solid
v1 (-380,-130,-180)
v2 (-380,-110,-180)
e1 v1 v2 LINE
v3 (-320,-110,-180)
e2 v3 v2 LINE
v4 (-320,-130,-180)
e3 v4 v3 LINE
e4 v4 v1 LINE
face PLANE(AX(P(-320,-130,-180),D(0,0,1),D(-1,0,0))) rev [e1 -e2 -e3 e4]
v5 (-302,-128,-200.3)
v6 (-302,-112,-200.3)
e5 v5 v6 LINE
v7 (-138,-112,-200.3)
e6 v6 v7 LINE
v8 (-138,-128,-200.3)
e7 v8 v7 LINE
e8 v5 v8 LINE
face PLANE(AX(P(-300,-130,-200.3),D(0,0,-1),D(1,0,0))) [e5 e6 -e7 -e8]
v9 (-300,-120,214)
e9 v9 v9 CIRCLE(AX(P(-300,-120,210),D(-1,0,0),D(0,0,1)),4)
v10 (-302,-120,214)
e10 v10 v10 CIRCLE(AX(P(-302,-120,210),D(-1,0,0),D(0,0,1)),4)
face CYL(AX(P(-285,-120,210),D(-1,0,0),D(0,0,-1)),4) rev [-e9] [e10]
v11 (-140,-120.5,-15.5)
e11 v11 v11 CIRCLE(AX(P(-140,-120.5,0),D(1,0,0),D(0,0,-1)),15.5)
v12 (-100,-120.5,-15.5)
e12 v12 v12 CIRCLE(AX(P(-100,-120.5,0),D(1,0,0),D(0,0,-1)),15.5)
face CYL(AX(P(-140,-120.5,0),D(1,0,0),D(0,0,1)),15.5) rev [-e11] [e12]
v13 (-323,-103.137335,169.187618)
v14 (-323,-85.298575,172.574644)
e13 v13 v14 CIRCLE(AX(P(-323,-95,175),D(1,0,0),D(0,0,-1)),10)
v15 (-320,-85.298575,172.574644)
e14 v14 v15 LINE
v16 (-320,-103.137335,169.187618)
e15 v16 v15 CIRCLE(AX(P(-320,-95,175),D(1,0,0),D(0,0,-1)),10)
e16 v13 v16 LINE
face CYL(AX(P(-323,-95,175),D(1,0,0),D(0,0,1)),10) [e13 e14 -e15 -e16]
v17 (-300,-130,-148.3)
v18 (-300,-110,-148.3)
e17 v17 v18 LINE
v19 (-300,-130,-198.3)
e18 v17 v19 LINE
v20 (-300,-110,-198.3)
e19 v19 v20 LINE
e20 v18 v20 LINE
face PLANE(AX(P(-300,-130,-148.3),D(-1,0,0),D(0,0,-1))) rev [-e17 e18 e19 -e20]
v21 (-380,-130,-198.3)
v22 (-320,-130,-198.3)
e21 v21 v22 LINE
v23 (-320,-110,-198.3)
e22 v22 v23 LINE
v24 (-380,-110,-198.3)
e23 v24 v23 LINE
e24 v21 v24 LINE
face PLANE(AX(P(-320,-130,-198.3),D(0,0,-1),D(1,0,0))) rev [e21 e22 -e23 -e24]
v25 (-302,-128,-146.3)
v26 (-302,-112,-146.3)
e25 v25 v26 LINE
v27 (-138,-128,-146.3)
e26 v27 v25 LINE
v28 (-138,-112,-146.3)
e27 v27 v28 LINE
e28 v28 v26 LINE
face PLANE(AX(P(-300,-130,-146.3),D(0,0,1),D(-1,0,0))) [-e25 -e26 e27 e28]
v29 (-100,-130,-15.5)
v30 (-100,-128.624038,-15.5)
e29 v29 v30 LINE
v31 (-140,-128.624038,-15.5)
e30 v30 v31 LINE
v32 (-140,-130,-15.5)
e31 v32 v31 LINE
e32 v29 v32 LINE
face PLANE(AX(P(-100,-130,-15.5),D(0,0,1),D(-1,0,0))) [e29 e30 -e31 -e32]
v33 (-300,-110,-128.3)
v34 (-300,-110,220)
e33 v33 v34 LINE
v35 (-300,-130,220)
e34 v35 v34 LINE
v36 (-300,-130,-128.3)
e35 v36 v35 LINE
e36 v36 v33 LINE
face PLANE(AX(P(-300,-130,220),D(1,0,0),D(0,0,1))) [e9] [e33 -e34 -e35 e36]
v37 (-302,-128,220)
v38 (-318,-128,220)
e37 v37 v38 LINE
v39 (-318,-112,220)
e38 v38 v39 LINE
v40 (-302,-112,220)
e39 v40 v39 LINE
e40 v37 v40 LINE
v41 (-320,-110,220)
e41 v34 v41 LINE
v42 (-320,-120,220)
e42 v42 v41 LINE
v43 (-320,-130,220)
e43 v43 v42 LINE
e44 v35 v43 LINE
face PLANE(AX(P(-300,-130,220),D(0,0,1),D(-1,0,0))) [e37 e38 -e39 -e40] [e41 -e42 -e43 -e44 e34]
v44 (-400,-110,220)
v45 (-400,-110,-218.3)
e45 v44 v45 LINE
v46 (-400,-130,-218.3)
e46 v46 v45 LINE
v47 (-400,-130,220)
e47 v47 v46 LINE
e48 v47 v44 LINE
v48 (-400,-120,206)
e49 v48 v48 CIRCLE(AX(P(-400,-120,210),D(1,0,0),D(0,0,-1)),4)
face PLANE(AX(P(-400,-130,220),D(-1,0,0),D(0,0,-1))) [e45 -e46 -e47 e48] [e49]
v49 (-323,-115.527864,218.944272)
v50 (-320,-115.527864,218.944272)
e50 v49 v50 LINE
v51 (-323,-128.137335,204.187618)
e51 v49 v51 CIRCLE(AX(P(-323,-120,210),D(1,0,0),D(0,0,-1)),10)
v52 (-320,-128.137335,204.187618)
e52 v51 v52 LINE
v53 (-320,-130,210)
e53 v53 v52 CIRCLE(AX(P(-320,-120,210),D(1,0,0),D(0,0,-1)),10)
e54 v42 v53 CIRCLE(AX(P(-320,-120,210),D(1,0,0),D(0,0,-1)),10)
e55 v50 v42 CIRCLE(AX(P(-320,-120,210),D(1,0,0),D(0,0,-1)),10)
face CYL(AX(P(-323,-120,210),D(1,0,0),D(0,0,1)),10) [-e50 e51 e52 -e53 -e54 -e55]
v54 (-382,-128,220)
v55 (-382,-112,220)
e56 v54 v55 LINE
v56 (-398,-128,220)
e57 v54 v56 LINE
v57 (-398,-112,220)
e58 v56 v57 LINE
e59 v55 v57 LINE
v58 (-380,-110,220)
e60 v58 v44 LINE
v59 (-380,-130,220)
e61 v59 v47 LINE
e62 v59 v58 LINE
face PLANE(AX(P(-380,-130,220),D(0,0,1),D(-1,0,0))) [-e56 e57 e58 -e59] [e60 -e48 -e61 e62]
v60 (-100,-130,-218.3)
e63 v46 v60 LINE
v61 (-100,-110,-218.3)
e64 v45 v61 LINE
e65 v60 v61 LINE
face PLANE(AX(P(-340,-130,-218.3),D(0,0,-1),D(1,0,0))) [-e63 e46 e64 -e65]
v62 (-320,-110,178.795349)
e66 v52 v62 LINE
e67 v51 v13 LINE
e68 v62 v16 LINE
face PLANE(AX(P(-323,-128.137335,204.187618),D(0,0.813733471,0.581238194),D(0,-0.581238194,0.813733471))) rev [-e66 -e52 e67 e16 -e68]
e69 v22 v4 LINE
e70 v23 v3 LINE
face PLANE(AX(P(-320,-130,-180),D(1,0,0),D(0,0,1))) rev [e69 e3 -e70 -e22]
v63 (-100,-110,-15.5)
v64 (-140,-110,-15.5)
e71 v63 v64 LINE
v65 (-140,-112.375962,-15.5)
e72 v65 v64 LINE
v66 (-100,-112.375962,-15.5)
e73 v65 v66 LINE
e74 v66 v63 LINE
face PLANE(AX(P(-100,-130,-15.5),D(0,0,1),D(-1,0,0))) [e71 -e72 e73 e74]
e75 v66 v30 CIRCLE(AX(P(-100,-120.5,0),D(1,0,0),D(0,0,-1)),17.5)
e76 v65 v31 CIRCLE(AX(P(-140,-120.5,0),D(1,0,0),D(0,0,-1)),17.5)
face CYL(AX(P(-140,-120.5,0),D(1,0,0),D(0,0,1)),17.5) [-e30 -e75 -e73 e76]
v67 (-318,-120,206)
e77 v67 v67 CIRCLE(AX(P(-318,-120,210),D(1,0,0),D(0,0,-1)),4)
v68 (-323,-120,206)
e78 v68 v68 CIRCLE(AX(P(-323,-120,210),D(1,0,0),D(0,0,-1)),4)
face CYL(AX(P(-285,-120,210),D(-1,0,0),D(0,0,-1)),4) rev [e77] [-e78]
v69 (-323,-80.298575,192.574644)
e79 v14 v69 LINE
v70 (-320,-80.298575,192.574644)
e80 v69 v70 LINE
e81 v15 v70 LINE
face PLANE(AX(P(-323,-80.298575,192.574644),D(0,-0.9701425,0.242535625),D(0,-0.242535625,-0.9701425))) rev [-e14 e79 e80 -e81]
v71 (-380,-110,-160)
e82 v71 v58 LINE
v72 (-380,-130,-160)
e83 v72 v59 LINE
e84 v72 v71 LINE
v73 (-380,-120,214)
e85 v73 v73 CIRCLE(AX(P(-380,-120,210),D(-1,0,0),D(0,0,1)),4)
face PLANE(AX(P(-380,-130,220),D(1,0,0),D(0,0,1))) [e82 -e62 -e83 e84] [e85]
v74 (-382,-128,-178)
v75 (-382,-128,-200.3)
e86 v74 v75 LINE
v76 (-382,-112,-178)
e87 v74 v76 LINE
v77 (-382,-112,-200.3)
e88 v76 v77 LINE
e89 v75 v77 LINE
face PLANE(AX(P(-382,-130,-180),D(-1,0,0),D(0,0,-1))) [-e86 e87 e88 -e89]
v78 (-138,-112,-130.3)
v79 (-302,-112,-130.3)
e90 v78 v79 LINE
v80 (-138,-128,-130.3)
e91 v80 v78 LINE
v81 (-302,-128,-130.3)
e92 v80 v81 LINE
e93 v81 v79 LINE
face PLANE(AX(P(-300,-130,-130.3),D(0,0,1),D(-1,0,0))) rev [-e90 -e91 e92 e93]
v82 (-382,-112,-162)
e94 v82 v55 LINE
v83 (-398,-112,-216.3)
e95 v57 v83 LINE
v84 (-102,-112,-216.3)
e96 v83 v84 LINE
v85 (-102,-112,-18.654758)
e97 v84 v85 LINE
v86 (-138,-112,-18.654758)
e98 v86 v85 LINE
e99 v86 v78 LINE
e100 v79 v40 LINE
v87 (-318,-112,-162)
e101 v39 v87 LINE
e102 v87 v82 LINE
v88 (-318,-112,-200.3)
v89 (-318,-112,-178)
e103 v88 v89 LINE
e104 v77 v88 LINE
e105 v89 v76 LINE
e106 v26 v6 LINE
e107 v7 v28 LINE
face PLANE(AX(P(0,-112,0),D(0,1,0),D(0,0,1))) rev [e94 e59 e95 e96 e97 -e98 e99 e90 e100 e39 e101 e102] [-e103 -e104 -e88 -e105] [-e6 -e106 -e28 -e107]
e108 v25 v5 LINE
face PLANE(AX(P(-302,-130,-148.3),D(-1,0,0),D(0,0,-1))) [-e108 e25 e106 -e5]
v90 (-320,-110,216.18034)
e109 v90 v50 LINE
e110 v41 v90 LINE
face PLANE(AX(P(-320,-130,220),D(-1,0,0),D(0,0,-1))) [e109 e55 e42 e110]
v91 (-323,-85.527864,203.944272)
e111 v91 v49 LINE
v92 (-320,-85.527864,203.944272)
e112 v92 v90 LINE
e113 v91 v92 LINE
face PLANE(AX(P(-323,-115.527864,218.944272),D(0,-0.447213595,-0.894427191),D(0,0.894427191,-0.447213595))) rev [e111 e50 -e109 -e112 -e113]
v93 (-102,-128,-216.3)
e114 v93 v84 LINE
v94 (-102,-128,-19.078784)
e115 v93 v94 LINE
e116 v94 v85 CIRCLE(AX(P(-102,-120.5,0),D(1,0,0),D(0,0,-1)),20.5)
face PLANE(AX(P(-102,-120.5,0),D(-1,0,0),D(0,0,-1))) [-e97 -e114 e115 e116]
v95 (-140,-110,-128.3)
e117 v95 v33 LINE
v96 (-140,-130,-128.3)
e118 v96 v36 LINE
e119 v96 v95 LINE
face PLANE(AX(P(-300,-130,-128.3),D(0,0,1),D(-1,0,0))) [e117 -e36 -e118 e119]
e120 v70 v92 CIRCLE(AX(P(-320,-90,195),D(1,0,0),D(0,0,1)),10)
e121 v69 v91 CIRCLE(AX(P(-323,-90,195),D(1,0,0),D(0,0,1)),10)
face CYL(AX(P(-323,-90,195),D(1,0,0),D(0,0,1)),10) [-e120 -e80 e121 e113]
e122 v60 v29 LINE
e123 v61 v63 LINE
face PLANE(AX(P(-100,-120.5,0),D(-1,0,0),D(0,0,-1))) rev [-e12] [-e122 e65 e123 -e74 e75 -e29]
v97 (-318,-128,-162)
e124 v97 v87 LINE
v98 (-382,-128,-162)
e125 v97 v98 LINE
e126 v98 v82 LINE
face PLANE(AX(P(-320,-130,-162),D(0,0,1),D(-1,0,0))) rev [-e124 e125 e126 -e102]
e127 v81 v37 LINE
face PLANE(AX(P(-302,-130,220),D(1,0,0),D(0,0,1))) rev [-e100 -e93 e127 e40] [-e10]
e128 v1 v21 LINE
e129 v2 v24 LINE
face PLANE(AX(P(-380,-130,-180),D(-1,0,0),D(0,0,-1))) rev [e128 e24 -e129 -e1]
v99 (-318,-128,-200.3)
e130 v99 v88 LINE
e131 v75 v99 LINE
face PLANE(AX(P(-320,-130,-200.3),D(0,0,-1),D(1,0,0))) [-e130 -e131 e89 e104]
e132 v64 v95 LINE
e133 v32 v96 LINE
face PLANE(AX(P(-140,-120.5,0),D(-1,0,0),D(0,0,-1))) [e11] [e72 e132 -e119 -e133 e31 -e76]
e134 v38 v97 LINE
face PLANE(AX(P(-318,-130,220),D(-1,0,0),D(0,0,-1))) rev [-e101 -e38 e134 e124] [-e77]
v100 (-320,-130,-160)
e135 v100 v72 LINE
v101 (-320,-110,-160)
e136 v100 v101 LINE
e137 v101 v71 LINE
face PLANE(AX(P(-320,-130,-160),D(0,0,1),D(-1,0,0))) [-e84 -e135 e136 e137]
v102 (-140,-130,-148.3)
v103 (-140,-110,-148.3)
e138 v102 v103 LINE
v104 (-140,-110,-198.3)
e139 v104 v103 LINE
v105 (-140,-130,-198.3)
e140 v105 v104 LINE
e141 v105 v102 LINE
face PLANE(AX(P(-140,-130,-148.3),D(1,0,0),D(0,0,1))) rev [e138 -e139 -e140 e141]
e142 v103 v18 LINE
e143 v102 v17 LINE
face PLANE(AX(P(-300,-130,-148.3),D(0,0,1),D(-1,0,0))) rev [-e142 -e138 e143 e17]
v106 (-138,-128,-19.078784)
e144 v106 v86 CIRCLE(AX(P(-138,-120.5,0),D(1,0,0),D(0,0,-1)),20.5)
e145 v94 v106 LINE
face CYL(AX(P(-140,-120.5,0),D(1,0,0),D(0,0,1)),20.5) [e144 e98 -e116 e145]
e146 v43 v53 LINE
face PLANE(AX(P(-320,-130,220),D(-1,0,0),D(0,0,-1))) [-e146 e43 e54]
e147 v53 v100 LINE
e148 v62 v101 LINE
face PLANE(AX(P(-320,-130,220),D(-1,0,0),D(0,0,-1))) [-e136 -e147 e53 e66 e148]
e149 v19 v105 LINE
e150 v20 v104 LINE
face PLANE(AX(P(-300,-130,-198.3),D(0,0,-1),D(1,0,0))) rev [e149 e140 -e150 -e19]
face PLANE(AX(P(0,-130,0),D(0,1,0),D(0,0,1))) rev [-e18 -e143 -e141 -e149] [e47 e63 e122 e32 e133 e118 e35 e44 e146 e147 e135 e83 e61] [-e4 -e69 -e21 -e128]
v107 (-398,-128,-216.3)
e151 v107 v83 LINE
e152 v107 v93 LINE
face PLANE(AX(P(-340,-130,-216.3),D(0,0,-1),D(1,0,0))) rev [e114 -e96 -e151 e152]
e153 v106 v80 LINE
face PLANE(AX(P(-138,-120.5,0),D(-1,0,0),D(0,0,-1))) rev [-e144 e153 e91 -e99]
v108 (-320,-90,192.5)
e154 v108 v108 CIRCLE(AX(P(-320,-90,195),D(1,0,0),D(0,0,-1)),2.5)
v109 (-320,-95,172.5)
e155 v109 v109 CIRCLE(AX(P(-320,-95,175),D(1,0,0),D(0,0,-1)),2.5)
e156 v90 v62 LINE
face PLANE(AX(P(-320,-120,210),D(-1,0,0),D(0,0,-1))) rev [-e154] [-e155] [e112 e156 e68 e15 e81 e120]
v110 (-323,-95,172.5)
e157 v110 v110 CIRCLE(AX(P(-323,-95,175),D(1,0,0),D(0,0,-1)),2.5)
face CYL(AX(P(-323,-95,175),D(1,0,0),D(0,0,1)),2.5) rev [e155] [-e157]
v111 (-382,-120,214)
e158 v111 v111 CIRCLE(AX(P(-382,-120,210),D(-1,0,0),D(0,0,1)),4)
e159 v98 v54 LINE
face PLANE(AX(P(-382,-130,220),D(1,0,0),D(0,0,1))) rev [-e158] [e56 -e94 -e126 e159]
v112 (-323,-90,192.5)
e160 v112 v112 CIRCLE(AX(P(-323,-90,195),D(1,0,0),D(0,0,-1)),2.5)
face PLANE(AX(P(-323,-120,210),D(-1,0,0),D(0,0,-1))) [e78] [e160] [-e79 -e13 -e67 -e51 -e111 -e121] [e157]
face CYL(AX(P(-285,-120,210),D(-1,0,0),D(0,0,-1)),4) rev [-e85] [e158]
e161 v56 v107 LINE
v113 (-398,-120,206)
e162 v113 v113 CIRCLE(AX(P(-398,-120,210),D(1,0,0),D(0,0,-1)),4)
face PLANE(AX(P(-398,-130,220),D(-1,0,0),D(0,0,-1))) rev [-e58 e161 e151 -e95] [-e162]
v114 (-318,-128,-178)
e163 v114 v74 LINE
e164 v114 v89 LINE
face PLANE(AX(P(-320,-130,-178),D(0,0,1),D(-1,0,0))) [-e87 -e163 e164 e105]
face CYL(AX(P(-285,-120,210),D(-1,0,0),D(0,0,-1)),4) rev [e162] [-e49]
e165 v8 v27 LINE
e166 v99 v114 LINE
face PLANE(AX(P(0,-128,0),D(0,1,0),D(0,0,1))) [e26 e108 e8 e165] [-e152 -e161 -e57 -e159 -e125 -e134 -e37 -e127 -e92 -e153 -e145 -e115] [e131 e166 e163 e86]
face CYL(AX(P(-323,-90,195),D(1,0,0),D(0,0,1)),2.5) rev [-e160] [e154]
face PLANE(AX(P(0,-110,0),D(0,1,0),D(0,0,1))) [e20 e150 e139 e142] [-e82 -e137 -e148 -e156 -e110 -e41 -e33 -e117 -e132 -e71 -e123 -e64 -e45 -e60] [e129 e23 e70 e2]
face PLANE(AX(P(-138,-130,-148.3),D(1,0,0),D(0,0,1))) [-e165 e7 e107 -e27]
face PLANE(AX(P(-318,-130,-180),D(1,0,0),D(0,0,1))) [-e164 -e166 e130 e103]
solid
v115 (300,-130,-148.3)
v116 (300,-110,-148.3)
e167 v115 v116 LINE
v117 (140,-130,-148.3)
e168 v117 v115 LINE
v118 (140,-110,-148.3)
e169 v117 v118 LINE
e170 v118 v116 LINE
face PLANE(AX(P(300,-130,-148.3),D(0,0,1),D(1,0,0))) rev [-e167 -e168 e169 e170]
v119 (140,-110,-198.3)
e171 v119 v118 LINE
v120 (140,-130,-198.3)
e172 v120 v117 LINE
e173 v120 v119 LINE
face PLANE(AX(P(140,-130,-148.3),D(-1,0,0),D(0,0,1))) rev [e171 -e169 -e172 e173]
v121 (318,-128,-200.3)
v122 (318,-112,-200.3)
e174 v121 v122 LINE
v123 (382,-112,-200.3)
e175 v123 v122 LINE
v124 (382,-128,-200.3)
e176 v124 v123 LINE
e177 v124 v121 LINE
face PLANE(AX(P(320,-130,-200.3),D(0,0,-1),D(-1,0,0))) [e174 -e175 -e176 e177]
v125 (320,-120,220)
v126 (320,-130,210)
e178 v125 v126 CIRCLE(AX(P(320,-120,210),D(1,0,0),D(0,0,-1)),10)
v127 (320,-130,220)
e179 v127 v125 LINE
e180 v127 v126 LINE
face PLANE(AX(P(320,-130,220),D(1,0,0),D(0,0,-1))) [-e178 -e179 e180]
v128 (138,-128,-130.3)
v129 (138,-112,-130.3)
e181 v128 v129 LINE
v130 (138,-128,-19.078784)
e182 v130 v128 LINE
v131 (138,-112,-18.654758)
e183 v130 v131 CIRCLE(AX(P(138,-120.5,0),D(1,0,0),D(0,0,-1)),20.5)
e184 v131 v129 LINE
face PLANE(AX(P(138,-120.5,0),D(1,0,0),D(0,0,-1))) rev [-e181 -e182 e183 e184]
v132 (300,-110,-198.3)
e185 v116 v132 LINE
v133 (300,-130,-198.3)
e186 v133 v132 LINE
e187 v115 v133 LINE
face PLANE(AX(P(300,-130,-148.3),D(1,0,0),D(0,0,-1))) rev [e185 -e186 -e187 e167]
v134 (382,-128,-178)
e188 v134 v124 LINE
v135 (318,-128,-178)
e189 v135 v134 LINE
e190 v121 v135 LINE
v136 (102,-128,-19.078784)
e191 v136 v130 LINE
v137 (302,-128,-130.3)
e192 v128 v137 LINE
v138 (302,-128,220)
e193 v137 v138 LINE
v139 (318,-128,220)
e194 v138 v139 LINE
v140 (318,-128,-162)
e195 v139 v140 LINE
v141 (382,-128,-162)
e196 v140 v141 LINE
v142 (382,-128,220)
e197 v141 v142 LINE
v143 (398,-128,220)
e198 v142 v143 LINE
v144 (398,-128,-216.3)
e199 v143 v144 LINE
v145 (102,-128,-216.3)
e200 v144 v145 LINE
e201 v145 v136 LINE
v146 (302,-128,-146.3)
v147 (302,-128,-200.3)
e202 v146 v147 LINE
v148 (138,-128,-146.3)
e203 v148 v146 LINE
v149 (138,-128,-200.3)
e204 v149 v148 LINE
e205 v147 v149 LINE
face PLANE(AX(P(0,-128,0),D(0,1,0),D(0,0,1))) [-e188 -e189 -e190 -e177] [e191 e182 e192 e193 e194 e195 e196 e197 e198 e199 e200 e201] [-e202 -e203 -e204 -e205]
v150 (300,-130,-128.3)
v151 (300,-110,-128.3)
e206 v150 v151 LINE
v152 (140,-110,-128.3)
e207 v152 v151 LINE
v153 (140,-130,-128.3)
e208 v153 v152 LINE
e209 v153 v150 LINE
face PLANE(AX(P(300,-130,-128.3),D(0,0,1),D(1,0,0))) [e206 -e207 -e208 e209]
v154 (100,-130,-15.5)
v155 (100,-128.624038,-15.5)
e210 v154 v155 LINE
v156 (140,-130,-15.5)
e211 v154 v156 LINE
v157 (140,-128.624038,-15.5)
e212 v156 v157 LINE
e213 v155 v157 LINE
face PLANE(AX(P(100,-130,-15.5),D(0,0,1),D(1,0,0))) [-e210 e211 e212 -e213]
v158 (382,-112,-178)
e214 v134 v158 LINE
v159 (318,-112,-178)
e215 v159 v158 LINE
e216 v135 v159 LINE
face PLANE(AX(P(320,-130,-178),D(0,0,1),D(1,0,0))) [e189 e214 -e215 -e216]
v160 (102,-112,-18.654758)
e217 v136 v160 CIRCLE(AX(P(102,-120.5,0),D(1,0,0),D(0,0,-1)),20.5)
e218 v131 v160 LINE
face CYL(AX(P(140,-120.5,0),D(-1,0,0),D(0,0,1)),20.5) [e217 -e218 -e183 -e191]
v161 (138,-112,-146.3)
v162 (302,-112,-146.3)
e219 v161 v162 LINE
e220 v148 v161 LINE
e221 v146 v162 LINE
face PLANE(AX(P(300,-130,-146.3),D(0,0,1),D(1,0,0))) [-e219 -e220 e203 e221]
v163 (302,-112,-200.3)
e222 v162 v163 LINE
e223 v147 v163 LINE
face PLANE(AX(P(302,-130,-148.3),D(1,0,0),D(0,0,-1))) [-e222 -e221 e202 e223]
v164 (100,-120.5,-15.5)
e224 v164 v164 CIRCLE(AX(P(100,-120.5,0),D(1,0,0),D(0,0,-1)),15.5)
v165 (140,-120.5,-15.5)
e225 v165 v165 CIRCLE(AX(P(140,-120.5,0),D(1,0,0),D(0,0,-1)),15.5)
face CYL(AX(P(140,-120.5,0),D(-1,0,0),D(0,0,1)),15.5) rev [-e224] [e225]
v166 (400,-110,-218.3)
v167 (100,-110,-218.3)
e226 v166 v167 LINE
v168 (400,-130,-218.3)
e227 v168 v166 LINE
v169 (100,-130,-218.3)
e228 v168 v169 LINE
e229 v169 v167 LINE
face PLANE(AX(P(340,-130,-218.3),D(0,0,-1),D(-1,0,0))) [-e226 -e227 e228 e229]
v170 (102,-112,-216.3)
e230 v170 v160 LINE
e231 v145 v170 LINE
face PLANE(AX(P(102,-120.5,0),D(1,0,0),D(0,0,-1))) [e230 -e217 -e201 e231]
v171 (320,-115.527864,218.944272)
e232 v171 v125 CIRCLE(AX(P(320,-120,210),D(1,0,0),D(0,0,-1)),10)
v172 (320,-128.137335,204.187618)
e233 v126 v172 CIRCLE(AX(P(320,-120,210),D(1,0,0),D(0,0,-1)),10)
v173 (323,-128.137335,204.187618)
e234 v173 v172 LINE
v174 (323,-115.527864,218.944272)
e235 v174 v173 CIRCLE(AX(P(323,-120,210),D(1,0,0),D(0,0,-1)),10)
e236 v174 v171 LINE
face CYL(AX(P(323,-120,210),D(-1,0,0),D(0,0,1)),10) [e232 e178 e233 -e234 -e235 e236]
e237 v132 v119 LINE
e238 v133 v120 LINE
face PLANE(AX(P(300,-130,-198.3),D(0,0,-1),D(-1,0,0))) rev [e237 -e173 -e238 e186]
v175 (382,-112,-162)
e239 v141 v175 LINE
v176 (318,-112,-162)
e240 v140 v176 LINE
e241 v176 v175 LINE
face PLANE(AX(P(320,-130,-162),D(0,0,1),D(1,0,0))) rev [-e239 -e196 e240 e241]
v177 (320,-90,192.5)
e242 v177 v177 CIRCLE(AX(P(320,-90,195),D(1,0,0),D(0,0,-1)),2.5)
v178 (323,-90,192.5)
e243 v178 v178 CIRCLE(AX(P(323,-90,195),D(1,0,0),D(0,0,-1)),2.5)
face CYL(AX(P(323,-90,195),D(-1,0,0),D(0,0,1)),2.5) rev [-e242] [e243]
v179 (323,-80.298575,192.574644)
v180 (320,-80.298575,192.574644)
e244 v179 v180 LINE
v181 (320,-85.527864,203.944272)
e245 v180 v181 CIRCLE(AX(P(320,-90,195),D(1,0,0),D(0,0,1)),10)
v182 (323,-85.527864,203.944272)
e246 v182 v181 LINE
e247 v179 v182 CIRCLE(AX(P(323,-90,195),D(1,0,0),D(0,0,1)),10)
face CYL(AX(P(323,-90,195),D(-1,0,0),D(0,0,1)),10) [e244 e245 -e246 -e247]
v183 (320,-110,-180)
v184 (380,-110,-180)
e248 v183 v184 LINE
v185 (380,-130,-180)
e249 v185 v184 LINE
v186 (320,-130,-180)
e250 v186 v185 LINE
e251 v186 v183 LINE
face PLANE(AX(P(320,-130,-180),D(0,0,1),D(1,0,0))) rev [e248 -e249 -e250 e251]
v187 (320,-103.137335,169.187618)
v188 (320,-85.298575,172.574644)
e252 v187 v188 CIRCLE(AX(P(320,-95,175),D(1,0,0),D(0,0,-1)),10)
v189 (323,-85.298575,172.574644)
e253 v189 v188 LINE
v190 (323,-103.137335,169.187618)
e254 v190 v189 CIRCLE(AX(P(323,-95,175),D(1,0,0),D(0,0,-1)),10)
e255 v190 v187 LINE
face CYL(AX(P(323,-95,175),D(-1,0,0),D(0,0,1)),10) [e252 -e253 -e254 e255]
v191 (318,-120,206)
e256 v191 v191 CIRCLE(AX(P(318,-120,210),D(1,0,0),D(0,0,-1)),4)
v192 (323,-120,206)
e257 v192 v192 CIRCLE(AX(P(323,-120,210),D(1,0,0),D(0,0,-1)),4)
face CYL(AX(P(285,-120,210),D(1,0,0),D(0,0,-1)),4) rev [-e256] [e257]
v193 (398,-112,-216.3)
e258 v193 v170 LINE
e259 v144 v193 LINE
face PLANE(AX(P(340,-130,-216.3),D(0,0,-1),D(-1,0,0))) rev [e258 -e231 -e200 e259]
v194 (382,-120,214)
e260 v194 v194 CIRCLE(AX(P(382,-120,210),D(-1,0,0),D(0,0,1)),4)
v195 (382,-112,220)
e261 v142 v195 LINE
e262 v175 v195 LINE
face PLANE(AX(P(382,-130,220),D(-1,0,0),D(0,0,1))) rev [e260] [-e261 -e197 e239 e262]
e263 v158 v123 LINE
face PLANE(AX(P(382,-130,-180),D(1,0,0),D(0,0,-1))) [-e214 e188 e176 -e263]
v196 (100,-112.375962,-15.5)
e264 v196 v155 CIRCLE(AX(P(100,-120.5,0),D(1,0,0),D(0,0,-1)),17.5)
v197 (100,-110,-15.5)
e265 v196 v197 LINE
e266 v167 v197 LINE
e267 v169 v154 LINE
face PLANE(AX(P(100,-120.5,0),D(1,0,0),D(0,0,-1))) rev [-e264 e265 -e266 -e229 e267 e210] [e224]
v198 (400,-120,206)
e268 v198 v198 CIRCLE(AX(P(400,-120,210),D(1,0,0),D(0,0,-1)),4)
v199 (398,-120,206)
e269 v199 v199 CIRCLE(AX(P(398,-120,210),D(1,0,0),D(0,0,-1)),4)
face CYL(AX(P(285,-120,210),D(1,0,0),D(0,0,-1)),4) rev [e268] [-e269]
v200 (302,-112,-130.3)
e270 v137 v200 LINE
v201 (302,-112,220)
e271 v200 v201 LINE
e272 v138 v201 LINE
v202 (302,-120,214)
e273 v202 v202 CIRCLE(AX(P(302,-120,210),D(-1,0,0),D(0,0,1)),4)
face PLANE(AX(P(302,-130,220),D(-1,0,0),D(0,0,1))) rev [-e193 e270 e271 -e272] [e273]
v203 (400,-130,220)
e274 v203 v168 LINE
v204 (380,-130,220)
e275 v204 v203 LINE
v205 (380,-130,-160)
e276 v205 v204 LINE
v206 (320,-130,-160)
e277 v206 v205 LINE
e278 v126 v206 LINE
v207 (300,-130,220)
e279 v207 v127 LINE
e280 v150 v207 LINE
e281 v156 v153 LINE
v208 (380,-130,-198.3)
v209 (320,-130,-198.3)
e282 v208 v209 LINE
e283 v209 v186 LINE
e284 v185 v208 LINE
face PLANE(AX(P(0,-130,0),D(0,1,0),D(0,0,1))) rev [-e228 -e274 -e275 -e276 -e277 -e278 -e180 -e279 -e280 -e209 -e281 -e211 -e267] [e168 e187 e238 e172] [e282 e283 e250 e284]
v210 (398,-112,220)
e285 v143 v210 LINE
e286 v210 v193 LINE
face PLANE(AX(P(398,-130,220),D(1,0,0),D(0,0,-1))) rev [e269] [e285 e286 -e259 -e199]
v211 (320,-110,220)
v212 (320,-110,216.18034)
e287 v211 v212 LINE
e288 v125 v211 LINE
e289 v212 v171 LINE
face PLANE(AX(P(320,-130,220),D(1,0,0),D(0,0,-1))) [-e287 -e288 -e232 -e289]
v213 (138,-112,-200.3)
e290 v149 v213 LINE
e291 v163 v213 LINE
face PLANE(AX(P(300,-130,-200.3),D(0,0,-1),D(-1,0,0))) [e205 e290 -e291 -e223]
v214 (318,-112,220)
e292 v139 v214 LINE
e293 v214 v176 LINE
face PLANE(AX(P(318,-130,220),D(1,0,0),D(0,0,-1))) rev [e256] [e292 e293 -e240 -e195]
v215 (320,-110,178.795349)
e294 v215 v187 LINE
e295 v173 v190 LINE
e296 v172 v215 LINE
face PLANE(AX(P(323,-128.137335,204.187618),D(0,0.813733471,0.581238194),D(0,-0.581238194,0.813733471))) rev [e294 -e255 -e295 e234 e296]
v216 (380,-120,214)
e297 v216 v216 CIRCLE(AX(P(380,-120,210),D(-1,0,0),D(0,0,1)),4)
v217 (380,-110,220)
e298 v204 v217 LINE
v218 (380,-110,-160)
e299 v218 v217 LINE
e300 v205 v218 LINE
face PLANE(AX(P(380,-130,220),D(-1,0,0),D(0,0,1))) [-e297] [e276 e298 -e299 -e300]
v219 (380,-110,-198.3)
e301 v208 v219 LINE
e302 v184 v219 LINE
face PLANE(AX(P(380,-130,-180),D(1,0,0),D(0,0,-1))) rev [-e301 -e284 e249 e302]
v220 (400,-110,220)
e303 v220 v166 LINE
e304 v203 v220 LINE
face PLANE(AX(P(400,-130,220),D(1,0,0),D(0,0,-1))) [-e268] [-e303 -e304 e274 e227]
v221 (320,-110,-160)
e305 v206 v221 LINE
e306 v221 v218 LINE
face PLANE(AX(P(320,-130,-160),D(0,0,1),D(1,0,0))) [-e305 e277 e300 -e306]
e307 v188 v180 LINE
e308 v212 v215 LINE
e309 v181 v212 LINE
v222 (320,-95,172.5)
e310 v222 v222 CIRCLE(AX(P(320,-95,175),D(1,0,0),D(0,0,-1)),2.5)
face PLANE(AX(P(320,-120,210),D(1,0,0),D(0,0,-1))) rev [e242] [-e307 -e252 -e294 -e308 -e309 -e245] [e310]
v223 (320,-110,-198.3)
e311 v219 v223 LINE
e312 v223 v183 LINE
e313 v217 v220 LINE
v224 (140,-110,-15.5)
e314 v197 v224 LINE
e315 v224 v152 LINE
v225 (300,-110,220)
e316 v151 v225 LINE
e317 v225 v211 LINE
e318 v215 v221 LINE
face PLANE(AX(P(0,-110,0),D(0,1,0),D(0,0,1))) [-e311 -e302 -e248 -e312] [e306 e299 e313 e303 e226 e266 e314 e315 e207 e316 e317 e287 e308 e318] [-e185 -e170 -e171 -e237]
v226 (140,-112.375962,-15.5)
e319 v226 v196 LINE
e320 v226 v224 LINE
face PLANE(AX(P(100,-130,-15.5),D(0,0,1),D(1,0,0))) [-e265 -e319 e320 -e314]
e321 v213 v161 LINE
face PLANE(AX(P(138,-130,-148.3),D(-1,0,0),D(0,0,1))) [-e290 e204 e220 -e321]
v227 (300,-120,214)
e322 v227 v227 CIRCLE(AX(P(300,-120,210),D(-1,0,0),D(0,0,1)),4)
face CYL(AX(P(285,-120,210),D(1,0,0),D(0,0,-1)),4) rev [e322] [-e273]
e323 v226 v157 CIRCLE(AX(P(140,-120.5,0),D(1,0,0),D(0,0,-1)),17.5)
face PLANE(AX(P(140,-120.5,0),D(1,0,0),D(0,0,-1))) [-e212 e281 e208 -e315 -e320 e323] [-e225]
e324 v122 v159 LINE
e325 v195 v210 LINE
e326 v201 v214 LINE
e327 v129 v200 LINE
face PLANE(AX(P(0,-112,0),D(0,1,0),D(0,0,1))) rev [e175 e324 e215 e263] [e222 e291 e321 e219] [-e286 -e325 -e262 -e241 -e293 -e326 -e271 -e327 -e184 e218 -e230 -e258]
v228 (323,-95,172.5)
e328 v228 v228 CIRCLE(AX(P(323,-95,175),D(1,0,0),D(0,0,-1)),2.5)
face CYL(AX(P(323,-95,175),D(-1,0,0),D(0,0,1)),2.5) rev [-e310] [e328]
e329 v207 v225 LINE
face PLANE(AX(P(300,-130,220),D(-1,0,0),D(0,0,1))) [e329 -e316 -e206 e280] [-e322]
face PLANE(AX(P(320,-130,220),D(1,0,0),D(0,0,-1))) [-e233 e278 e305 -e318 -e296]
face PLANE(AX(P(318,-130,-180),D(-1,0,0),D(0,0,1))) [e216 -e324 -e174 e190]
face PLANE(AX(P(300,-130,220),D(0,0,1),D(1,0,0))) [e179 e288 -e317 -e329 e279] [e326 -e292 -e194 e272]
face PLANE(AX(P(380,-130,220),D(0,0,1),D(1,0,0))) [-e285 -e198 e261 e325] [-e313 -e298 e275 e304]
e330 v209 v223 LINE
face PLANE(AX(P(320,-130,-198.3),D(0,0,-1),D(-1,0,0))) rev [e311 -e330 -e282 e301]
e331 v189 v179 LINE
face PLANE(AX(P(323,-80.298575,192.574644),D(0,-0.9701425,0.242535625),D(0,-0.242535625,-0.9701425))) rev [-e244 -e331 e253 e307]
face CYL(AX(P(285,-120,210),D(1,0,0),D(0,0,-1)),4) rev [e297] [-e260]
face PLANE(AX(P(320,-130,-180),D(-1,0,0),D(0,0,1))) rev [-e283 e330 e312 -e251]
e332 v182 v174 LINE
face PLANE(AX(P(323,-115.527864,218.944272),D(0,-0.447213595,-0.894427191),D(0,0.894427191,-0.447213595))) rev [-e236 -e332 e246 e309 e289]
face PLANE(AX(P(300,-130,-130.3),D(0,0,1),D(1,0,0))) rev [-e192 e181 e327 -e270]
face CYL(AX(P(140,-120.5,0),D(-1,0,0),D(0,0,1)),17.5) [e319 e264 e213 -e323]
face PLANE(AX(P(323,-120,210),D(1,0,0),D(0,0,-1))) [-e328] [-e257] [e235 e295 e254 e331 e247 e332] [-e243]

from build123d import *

# Parameters (mm, degrees)
BOSS_EXTRUDE1_START = 100
SKETCH4_R           = 17.5
SKETCH4_R_2         = 15.5
BOSS_EXTRUDE1_DEPTH = 40
BOSS_EXTRUDE2_START = -110
SKETCH5_W           = 60
SKETCH5_H           = 18.3
SKETCH5_W_2         = 160
SKETCH5_H_2         = 50
BOSS_EXTRUDE2_DEPTH = 20
SHELL1_START        = 102
SHELL1_DEPTH        = 36
SHELL1_START_2      = 302
SHELL1_2_OUTLINE_W  = 16
SHELL1_2_OUTLINE_H  = 436.3
SHELL1_2_DEPTH      = 16
SHELL1_START_3      = 382
SHELL1_3_OUTLINE_W  = 16
SHELL1_3_OUTLINE_H  = 436.3
SHELL1_3_DEPTH      = 16
SHELL1_START_4      = 138
SHELL1_4_OUTLINE_W  = 16
SHELL1_4_OUTLINE_H  = 16
SHELL1_4_DEPTH      = 164
SHELL1_START_5      = 318
SHELL1_5_OUTLINE_W  = 16
SHELL1_5_OUTLINE_H  = 16
SHELL1_5_DEPTH      = 64
SKETCH7_R           = 4
CUT_EXTRUDE1_DEPTH  = 115
BOSS_EXTRUDE3_START = 3
SKETCH8_R           = 2.5
SKETCH8_R_2         = 4
BOSS_EXTRUDE3_DEPTH = 3


# Read off the part's stored shape, not the designer's step: Shell1
with BuildPart() as part:
    # Sketch4 → Boss-Extrude1 (new body)
    with BuildSketch(Plane(origin=(0, 0, 0), x_dir=(0, 0, -1), z_dir=(1, 0, 0)).offset(BOSS_EXTRUDE1_START)):
        with Locations((0, -120.5)):
            Circle(SKETCH4_R)
        with Locations((0, -120.5)):
            Circle(SKETCH4_R_2, mode=Mode.SUBTRACT)
    extrude(amount=BOSS_EXTRUDE1_DEPTH)

    # Sketch5 → Boss-Extrude2 (add)
    with BuildSketch(Plane(origin=(0, 0, 0), x_dir=(1, 0, 0), z_dir=(0, 1, 0)).offset(BOSS_EXTRUDE2_START)):
        Polygon((320, 160), (380, 160), (380, -220), (400, -220), (400, 218.3), (360, 218.3), (340, 218.3), (100, 218.3), (100, 15.5), (140, 15.5), (140, 128.3), (300, 128.3), (300, -220), (320, -220), align=None)
        with Locations((350, 189.15)):
            Rectangle(SKETCH5_W, SKETCH5_H, mode=Mode.SUBTRACT)
        with Locations((220, 173.3)):
            Rectangle(SKETCH5_W_2, SKETCH5_H_2, mode=Mode.SUBTRACT)
    extrude(amount=-BOSS_EXTRUDE2_DEPTH)

    # Shell1 outline → Shell1 (cut)
    with BuildSketch(Plane.YZ.offset(SHELL1_START)):
        with BuildLine():
            ThreePointArc((-112, -18.654758106), (-119.95690747, -20.492804847), (-128, -19.078784028))
            Line((-128, -19.078784028), (-128, -216.3))
            Line((-128, -216.3), (-112, -216.3))
            Line((-112, -216.3), (-112, -18.654758106))
        make_face()
    extrude(amount=SHELL1_DEPTH, mode=Mode.SUBTRACT)

    # Shell1 2 outline → Shell1 2 (cut)
    with BuildSketch(Plane.YZ.offset(SHELL1_START_2)):
        with Locations((-120, 1.85)):
            Rectangle(SHELL1_2_OUTLINE_W, SHELL1_2_OUTLINE_H)
    extrude(amount=SHELL1_2_DEPTH, mode=Mode.SUBTRACT)

    # Shell1 3 outline → Shell1 3 (cut)
    with BuildSketch(Plane.YZ.offset(SHELL1_START_3)):
        with Locations((-120, 1.85)):
            Rectangle(SHELL1_3_OUTLINE_W, SHELL1_3_OUTLINE_H)
    extrude(amount=SHELL1_3_DEPTH, mode=Mode.SUBTRACT)

    # Shell1 4 outline → Shell1 4 (cut)
    with BuildSketch(Plane.YZ.offset(SHELL1_START_4)):
        with Locations((-120, -138.3)):
            Rectangle(SHELL1_4_OUTLINE_W, SHELL1_4_OUTLINE_H)
        with Locations((-120, -208.3)):
            Rectangle(SHELL1_4_OUTLINE_W, SHELL1_4_OUTLINE_H)
    extrude(amount=SHELL1_4_DEPTH, mode=Mode.SUBTRACT)

    # Shell1 5 outline → Shell1 5 (cut)
    with BuildSketch(Plane.YZ.offset(SHELL1_START_5)):
        with Locations((-120, -170)):
            Rectangle(SHELL1_5_OUTLINE_W, SHELL1_5_OUTLINE_H)
        with Locations((-120, -208.3)):
            Rectangle(SHELL1_5_OUTLINE_W, SHELL1_5_OUTLINE_H)
    extrude(amount=SHELL1_5_DEPTH, mode=Mode.SUBTRACT)

    # Sketch7 → Cut-Extrude1 (cut)
    with BuildSketch(Plane(origin=(400, 0, 0), x_dir=(0, 0, -1), z_dir=(1, 0, 0))):
        with Locations((-210, -120)):
            Circle(SKETCH7_R)
    extrude(amount=-CUT_EXTRUDE1_DEPTH, mode=Mode.SUBTRACT)

    # Sketch8 → Boss-Extrude3 (add)
    with BuildSketch(Plane(origin=(320, 0, 0), x_dir=(0, 0, -1), z_dir=(1, 0, 0)).offset(BOSS_EXTRUDE3_START)):
        with BuildLine():
            Line((-204.187618063, -128.137334712), (-169.187618063, -103.137334712))
            ThreePointArc((-169.187618063, -103.137334712), (-165.17551937, -93.134636668), (-172.57464375, -85.298574999))
            Line((-172.57464375, -85.298574999), (-192.57464375, -80.298574999))
            ThreePointArc((-192.57464375, -80.298574999), (-199.178568095, -80.914871015), (-203.94427191, -85.527864045))
            Line((-203.94427191, -85.527864045), (-218.94427191, -115.527864045))
            ThreePointArc((-218.94427191, -115.527864045), (-216.496296739, -127.602508052), (-204.187618063, -128.137334712))
        make_face()
        with Locations((-195, -90)):
            Circle(SKETCH8_R, mode=Mode.SUBTRACT)
        with Locations((-175, -95)):
            Circle(SKETCH8_R, mode=Mode.SUBTRACT)
        with Locations((-210, -120)):
            Circle(SKETCH8_R_2, mode=Mode.SUBTRACT)
    extrude(amount=-BOSS_EXTRUDE3_DEPTH)


with BuildPart() as body_2:
    # Mirror3: mirrored copy
    add(part.part.mirror(Plane(origin=(0, 0, 0), x_dir=(0, 0, 1), z_dir=(1, 0, 0))))


solid = Compound([part.part, body_2.part])
